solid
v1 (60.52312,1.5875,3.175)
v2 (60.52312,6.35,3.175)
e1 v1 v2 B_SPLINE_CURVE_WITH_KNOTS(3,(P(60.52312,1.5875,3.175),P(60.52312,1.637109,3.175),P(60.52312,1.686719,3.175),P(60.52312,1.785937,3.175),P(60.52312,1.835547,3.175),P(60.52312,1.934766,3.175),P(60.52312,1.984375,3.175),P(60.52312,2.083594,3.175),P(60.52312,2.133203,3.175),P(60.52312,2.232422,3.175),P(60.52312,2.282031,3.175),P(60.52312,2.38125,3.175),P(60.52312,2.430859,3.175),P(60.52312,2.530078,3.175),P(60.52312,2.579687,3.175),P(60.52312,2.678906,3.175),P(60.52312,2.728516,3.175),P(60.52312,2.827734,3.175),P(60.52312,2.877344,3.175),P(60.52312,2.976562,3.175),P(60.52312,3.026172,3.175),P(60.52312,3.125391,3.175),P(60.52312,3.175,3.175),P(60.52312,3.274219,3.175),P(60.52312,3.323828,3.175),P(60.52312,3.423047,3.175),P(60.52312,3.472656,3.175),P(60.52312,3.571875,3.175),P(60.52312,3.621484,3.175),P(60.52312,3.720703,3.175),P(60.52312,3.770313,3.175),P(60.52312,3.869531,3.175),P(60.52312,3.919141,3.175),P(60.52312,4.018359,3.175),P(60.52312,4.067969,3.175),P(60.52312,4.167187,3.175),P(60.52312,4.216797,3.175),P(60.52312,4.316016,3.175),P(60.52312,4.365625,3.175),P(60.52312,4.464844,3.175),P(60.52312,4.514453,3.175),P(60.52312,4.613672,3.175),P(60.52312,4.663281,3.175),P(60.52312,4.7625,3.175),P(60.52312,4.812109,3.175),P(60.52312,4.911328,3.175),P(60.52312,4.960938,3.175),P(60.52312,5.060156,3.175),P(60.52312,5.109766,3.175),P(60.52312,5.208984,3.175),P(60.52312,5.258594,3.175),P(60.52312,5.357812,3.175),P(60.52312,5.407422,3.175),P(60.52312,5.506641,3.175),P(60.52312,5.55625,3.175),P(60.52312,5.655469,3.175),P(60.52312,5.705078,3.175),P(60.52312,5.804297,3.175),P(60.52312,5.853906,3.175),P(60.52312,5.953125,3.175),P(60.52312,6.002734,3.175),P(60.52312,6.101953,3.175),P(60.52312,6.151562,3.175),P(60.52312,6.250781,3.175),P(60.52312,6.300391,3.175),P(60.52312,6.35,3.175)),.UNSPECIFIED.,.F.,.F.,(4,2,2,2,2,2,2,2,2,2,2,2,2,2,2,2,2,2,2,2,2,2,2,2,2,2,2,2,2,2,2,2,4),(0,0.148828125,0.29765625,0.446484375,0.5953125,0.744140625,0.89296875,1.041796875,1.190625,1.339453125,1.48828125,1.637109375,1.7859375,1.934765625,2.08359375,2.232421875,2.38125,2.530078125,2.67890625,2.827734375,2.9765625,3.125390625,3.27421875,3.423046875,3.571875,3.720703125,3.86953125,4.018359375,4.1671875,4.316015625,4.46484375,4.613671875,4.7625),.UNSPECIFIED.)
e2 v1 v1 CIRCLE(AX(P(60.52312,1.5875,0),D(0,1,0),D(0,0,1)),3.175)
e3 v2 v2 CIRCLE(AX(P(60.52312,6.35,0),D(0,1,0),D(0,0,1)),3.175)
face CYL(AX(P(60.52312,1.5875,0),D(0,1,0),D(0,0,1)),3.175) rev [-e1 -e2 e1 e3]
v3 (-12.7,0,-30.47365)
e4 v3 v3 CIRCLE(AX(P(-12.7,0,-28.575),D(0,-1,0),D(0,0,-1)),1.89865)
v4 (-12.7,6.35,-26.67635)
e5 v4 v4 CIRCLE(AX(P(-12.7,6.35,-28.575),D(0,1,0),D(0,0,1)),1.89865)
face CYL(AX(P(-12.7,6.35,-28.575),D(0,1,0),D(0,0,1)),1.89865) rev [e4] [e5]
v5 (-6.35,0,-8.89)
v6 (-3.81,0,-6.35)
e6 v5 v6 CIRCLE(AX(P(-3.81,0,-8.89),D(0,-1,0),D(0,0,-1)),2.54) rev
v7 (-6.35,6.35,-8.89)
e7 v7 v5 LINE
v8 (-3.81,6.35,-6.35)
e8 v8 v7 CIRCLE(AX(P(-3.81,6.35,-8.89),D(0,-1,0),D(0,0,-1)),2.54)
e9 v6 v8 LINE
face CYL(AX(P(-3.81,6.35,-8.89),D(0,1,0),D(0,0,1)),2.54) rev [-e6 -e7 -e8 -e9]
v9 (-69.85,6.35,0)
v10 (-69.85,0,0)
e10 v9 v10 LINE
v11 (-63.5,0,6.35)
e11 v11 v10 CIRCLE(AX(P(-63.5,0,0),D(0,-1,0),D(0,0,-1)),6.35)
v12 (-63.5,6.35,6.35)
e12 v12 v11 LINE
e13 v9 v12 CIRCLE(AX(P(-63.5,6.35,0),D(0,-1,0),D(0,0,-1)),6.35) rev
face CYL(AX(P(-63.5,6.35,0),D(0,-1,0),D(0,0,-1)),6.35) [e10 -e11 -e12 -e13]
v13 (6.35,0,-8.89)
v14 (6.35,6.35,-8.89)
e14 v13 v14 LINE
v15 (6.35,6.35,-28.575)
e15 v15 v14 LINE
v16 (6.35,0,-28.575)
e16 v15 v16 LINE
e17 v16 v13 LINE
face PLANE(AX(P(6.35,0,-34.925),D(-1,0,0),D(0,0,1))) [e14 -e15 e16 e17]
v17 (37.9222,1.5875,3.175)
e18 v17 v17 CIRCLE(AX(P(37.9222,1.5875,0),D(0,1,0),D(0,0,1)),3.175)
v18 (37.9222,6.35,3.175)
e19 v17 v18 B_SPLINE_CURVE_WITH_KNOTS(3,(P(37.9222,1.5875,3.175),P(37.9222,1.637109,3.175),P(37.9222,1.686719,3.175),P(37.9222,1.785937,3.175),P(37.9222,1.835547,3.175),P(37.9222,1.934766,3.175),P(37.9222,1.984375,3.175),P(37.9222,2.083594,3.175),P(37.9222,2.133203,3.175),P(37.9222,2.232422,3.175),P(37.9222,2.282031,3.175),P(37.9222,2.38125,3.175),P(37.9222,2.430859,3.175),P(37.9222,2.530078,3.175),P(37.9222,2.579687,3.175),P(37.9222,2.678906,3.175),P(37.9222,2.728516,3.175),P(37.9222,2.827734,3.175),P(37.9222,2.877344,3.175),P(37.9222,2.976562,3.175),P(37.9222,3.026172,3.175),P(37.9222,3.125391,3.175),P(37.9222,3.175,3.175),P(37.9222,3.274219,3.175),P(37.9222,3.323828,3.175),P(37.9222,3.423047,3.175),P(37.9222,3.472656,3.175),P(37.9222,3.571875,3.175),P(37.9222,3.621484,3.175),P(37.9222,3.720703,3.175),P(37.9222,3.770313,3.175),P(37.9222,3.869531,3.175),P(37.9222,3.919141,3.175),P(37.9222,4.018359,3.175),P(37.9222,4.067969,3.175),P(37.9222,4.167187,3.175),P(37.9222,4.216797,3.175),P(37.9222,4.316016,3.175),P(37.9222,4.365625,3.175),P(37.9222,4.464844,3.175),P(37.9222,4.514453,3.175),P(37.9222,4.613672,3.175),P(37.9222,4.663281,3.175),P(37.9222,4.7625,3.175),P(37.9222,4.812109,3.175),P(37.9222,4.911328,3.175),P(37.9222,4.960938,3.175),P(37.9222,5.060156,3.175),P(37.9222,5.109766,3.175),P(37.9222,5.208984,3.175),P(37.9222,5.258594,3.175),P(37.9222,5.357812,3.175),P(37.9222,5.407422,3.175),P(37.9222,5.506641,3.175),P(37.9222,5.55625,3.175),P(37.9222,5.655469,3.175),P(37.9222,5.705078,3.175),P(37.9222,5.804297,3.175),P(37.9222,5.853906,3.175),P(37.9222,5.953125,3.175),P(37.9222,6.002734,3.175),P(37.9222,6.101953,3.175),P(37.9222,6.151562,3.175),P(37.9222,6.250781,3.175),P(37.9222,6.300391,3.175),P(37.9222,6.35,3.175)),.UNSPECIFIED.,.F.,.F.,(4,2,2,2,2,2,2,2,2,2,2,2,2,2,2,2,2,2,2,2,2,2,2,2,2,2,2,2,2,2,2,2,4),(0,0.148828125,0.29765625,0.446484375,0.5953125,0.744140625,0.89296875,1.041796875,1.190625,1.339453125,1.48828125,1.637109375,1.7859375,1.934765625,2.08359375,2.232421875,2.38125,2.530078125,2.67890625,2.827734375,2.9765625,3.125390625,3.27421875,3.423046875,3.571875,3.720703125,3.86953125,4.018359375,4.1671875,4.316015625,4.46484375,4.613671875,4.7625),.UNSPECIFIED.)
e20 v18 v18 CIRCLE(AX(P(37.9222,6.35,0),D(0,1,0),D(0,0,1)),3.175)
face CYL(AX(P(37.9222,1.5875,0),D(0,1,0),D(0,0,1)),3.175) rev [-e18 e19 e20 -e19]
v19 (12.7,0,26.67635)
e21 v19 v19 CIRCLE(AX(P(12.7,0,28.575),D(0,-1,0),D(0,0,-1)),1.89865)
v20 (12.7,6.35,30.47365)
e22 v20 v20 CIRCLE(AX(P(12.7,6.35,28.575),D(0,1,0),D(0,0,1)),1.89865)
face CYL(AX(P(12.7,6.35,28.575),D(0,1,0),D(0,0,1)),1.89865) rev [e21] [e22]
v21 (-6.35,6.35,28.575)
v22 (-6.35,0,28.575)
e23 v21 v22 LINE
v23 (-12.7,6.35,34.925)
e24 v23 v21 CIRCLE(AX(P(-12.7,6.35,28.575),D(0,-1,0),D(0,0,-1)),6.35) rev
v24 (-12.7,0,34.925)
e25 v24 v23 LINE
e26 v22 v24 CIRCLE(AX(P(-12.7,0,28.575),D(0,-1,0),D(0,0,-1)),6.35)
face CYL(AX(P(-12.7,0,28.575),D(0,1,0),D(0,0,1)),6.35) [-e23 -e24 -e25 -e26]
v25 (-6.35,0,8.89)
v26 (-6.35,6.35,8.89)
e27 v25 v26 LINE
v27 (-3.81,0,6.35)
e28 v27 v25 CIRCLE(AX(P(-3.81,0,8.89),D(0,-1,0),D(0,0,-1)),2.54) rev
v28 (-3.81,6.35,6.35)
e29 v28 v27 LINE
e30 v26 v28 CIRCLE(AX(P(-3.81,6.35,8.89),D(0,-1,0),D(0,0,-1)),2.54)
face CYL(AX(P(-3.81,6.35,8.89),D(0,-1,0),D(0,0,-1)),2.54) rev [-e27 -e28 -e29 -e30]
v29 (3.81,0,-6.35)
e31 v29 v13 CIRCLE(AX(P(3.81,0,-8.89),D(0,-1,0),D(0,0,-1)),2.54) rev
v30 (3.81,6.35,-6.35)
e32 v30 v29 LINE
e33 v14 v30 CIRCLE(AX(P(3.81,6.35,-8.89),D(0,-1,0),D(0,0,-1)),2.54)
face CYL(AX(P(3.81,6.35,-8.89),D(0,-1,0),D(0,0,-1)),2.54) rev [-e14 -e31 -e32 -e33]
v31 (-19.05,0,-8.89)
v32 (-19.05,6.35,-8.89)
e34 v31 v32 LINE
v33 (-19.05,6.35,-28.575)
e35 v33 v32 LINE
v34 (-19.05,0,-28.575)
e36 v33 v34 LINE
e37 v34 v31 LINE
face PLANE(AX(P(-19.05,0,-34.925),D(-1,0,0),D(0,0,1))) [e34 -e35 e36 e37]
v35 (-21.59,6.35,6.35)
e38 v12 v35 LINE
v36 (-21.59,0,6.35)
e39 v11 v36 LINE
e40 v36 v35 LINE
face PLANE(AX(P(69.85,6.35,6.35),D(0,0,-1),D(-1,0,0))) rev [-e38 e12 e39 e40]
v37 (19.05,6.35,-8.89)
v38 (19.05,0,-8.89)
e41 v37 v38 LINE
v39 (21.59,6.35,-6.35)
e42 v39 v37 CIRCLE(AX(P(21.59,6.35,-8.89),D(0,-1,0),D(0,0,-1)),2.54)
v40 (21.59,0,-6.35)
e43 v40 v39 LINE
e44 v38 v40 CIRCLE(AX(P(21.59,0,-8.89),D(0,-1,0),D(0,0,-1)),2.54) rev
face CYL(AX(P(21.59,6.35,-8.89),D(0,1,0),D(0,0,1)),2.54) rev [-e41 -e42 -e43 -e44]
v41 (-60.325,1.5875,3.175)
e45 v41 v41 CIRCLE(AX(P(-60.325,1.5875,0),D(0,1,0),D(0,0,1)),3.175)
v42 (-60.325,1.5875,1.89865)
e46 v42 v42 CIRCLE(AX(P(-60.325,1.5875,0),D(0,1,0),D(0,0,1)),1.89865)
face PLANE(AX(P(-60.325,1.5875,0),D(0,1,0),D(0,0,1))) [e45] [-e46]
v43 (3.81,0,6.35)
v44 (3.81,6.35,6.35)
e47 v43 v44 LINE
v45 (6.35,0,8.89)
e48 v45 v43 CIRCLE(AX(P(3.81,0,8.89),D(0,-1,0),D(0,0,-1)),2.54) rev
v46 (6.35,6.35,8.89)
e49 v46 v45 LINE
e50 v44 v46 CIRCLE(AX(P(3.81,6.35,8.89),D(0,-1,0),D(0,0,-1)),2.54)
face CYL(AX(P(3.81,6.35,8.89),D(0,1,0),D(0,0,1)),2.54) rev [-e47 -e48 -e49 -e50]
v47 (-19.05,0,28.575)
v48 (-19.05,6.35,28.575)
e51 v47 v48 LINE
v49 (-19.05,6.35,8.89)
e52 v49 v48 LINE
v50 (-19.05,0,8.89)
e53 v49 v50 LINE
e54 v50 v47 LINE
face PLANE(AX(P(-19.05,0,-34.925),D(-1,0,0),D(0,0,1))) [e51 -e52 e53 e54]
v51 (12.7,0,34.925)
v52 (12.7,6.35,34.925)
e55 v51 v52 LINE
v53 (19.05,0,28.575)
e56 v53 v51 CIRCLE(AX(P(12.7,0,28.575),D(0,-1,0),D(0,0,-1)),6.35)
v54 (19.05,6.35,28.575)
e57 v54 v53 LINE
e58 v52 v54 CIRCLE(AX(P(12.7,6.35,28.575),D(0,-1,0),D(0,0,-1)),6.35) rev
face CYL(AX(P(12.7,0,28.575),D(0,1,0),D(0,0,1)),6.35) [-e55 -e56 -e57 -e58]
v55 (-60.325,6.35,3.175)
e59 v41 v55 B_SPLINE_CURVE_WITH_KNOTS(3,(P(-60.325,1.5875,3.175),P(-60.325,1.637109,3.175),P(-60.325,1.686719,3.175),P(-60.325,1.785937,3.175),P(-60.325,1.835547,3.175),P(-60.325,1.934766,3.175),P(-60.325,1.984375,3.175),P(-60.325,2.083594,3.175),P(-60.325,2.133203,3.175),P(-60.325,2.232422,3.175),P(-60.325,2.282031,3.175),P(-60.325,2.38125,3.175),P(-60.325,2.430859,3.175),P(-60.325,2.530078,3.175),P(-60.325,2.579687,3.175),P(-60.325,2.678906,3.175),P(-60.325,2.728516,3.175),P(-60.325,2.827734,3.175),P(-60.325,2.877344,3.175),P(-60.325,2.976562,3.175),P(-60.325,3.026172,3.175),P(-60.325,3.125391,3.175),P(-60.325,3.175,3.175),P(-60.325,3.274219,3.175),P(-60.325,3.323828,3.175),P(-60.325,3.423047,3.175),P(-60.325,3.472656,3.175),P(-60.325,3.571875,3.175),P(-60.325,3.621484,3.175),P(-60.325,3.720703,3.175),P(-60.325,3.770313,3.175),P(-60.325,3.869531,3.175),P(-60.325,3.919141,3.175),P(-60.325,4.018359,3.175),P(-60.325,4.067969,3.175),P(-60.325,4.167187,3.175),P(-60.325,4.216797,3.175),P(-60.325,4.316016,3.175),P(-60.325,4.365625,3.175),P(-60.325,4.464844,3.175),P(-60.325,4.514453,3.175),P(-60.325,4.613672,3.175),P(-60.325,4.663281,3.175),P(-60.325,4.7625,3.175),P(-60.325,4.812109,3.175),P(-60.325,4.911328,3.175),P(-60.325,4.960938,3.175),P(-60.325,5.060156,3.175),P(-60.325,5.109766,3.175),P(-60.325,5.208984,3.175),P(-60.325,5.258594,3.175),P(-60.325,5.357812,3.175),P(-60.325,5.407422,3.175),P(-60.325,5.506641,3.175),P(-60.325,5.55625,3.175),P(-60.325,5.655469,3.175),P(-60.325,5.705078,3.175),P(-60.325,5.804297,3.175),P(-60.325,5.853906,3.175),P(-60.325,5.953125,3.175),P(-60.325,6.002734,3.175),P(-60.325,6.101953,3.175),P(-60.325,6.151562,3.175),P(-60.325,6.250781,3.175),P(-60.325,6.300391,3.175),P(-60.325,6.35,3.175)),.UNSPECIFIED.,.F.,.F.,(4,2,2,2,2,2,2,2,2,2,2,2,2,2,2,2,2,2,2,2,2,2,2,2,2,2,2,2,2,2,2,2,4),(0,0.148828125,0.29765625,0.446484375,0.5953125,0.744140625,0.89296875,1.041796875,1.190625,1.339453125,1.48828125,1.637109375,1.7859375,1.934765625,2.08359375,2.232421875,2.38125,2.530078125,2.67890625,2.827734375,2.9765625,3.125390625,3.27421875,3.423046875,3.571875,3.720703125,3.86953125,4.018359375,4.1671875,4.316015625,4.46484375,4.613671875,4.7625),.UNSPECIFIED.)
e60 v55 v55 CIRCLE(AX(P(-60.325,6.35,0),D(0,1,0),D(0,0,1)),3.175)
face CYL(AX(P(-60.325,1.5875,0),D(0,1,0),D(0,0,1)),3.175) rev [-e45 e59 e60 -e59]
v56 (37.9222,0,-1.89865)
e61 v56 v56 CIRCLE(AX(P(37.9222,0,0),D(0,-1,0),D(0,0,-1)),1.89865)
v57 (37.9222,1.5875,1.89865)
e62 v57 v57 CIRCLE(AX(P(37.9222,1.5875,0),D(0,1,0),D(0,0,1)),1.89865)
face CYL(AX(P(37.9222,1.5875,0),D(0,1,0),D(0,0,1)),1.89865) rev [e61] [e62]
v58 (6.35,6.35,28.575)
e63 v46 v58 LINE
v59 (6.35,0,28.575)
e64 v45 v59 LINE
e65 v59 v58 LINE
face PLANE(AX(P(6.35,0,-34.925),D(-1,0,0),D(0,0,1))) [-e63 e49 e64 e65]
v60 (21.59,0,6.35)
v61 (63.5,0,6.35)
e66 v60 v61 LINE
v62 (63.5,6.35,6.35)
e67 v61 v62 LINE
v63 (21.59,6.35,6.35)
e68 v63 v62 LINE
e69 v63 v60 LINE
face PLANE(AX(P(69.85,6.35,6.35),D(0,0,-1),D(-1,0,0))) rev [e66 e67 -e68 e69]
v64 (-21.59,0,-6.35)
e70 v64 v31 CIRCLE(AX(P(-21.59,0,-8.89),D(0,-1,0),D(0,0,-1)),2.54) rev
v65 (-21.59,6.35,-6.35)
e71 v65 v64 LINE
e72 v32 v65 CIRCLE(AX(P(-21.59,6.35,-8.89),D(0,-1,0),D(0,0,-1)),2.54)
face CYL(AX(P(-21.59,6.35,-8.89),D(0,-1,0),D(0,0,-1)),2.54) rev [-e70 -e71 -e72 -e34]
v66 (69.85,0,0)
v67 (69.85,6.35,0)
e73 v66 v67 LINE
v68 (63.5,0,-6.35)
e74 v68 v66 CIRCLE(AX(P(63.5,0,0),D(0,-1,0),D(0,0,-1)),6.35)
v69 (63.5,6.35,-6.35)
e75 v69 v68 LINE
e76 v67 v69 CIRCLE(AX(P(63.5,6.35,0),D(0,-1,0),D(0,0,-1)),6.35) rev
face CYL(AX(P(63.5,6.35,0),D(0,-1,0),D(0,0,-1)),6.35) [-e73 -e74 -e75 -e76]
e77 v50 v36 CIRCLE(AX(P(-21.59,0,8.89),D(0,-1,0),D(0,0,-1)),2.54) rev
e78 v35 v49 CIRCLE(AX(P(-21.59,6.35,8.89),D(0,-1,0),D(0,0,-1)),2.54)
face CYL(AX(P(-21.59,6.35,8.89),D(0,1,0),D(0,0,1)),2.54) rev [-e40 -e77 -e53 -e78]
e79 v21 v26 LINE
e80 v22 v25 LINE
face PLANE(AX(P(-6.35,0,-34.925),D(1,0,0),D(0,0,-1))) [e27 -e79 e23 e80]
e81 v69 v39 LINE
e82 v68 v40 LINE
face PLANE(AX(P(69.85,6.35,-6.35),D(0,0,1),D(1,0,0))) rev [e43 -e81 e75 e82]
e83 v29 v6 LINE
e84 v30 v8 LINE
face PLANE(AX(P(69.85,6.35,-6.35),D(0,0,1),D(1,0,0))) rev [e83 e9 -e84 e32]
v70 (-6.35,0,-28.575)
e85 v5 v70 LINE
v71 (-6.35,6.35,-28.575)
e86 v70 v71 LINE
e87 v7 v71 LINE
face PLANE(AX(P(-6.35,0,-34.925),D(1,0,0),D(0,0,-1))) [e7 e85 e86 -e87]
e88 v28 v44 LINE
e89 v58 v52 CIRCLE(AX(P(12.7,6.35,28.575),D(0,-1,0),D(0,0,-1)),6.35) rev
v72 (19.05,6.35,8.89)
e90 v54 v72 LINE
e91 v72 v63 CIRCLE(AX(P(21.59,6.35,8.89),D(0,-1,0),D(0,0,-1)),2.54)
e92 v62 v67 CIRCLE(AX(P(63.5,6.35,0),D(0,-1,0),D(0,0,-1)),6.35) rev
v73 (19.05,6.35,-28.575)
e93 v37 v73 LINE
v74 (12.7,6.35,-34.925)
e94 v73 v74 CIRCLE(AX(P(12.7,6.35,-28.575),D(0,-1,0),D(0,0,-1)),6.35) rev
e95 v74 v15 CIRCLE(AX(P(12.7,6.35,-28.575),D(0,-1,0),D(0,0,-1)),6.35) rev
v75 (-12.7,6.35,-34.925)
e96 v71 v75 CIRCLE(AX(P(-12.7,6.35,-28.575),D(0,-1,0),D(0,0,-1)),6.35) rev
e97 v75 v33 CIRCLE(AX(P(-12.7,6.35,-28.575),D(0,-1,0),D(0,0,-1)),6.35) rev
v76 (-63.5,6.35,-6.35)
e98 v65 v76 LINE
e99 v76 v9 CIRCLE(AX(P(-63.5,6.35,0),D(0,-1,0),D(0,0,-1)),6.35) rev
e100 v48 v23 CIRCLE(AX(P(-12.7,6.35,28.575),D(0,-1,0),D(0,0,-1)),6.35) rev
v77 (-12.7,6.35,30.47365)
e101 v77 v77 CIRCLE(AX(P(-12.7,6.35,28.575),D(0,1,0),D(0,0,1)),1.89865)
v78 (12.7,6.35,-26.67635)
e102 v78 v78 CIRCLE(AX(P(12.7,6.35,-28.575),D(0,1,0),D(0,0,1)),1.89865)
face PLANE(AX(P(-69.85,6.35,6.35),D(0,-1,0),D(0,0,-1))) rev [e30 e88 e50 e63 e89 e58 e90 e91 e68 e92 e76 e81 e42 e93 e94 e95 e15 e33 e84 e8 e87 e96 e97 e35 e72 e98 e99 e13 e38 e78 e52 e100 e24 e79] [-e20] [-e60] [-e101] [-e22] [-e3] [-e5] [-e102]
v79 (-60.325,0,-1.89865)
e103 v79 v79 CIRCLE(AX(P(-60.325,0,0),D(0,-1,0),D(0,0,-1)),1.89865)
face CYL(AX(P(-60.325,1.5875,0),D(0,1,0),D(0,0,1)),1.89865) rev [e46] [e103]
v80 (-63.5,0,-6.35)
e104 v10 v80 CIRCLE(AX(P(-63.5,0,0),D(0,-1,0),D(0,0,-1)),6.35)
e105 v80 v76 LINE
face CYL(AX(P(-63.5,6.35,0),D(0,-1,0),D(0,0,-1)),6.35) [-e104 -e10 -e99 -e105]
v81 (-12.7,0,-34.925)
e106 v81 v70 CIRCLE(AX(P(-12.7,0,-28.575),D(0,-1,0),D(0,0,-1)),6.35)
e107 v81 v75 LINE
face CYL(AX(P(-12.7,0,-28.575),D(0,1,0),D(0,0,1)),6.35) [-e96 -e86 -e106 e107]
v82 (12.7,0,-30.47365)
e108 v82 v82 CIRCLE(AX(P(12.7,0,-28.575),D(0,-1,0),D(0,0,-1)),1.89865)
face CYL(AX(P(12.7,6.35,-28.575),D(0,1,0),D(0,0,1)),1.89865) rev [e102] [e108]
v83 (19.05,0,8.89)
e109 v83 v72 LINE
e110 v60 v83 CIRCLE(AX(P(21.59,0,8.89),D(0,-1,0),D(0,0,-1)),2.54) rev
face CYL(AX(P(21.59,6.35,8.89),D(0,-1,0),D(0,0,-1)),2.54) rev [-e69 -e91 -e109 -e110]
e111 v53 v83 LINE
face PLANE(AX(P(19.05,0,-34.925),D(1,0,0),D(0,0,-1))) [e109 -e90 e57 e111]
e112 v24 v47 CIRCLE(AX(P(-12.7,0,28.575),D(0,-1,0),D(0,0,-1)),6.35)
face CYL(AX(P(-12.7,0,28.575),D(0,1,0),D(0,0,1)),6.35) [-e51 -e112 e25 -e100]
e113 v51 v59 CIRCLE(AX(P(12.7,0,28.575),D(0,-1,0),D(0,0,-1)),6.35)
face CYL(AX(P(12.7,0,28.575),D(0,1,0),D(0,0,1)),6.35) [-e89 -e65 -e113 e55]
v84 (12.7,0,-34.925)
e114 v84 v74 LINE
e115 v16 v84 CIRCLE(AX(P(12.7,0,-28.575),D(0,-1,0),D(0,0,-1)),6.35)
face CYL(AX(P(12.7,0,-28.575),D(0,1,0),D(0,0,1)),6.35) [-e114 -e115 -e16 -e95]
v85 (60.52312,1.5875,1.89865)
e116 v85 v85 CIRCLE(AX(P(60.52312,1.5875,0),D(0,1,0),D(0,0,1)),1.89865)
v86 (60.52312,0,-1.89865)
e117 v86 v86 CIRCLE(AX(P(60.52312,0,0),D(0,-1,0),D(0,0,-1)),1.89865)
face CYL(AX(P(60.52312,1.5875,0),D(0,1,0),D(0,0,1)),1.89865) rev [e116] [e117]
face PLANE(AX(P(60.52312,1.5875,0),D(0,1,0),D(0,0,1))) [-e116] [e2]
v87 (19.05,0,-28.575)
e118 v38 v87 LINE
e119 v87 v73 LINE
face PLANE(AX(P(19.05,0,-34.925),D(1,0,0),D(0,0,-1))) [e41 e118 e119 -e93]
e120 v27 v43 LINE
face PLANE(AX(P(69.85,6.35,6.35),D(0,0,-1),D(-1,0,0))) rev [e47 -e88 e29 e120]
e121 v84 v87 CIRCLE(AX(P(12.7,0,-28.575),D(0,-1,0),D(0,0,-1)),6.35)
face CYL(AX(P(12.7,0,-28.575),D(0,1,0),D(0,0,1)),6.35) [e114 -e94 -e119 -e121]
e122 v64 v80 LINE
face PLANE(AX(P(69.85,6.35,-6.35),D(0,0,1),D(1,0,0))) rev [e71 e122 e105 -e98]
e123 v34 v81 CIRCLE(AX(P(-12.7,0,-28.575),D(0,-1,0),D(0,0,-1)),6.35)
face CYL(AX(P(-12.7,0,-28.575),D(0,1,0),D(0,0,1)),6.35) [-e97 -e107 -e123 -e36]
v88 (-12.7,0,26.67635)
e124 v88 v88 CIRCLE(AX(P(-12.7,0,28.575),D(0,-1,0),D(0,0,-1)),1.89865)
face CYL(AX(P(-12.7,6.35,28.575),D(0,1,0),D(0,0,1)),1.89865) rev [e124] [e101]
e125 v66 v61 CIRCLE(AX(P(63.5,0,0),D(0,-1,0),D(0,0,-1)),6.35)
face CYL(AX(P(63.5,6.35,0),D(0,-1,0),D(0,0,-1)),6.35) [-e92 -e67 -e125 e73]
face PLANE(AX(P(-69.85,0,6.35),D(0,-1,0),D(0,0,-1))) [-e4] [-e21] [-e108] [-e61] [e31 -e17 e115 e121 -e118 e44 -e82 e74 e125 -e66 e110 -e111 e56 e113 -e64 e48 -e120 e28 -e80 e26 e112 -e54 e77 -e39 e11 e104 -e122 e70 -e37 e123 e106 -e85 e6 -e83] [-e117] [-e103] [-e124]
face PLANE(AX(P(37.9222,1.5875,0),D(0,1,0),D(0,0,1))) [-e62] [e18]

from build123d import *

# Parameters (mm, degrees)
SKETCH1_W                 = 139.7
SKETCH1_H                 = 12.7
BOSS_EXTRUDE1_DEPTH       = 6.35
SKETCH2_R                 = 3.175
CUT_EXTRUDE2_DEPTH        = 4.7625
SKETCH3_R                 = 3.175
CUT_EXTRUDE3_DEPTH        = 4.7625
FILLET1_R                 = 6.35
F_6_CLEARANCE_HOLE1_D     = 3.7973
F_6_CLEARANCE_HOLE1_DEPTH = 25.4
F_6_CLEARANCE_HOLE1_TIP   = 1.140824014
F_6_CLEARANCE_HOLE2_D     = 3.7973
F_6_CLEARANCE_HOLE2_DEPTH = 25.4
F_6_CLEARANCE_HOLE2_TIP   = 1.140824014
SKETCH8_W                 = 12.7
SKETCH8_H                 = 69.85
BOSS_EXTRUDE2_DEPTH       = 6.35
F_6_CLEARANCE_HOLE3_D     = 3.7973
F_6_CLEARANCE_HOLE3_DEPTH = 25.4
F_6_CLEARANCE_HOLE3_TIP   = 1.140824014
FILLET2_R                 = 2.54
FILLET3_R                 = 6.35


with BuildPart() as part:
    # Sketch1 → Boss-Extrude1 (new body)
    with BuildSketch(Plane(origin=(0, 0, 0), x_dir=(1, 0, 0), z_dir=(0, 1, 0))):
        Rectangle(SKETCH1_W, SKETCH1_H)
    extrude(amount=BOSS_EXTRUDE1_DEPTH)

    # Sketch2 → Cut-Extrude2 (cut)
    with BuildSketch(Plane(origin=(0, 6.35, 0), x_dir=(1, 0, 0), z_dir=(0, 1, 0))):
        with Locations(Location((-60.325, 0, 0), (0, 0, 270))):
            Circle(SKETCH2_R)
        with Locations(Location((37.9222, 0, 0), (0, 0, 270))):
            Circle(SKETCH2_R)
        with Locations(Location((60.52312, 0, 0), (0, 0, 270))):
            Circle(SKETCH2_R)
    extrude(amount=-CUT_EXTRUDE2_DEPTH, mode=Mode.SUBTRACT)

    # Sketch3 → Cut-Extrude3 (cut)
    with BuildSketch(Plane.XZ):
        with Locations(Location((-12.7, 0, 0), (0, 0, 270))):
            Circle(SKETCH3_R)
        with Locations(Location((12.7, 0, 0), (0, 0, 270))):
            Circle(SKETCH3_R)
    extrude(amount=-CUT_EXTRUDE3_DEPTH, mode=Mode.SUBTRACT)

    # Fillet1
    fillet1_edges = [part.edges().sort_by_distance(p)[0] for p in [
        (69.85, 3.175, 6.35),
        (69.85, 3.175, -6.35),
        (-69.85, 3.175, 6.35),
        (-69.85, 3.175, -6.35),
    ]]
    fillet(fillet1_edges, radius=FILLET1_R - 0.0001)  # a hair under: the kernel refuses the full size

    # #6 Clearance Hole1
    with Locations(Plane(origin=(0, 1.5875, 0), x_dir=(-1, 0, 0), z_dir=(0, 1, 0))):
        with Locations((-60.52312, 0), (-37.9222, 0), (60.325, 0)):
            Hole(F_6_CLEARANCE_HOLE1_D / 2, depth=F_6_CLEARANCE_HOLE1_DEPTH)
            with Locations((0, 0, -(F_6_CLEARANCE_HOLE1_DEPTH + F_6_CLEARANCE_HOLE1_TIP / 2))):  # 118° drill point
                Cone(0, F_6_CLEARANCE_HOLE1_D / 2, F_6_CLEARANCE_HOLE1_TIP, mode=Mode.SUBTRACT)

    # #6 Clearance Hole2
    with Locations(Plane.XZ.offset(-4.7625)):
        with Locations((-12.7, 0), (12.7, 0)):
            Hole(F_6_CLEARANCE_HOLE2_D / 2, depth=F_6_CLEARANCE_HOLE2_DEPTH)
            with Locations((0, 0, -(F_6_CLEARANCE_HOLE2_DEPTH + F_6_CLEARANCE_HOLE2_TIP / 2))):  # 118° drill point
                Cone(0, F_6_CLEARANCE_HOLE2_D / 2, F_6_CLEARANCE_HOLE2_TIP, mode=Mode.SUBTRACT)

    # Sketch8 → Boss-Extrude2 (add)
    with BuildSketch(Plane(origin=(0, 6.35, 0), x_dir=(1, 0, 0), z_dir=(0, 1, 0))):
        with Locations((-12.7, 0)):
            Rectangle(SKETCH8_W, SKETCH8_H)
        with Locations((12.7, 0)):
            Rectangle(SKETCH8_W, SKETCH8_H)
    extrude(amount=-BOSS_EXTRUDE2_DEPTH)

    # #6 Clearance Hole3
    with Locations(Plane(origin=(0, 6.35, 0), x_dir=(-1, 0, 0), z_dir=(0, 1, 0))):
        with Locations((12.7, -28.575), (12.7, 28.575), (-12.7, 28.575), (-12.7, -28.575)):
            Hole(F_6_CLEARANCE_HOLE3_D / 2, depth=F_6_CLEARANCE_HOLE3_DEPTH)
            with Locations((0, 0, -(F_6_CLEARANCE_HOLE3_DEPTH + F_6_CLEARANCE_HOLE3_TIP / 2))):  # 118° drill point
                Cone(0, F_6_CLEARANCE_HOLE3_D / 2, F_6_CLEARANCE_HOLE3_TIP, mode=Mode.SUBTRACT)

    # Fillet2
    fillet2_edges = [part.edges().sort_by_distance(p)[0] for p in [
        (6.35, 3.175, 6.35),
        (6.35, 3.175, -6.35),
        (19.05, 3.175, 6.35),
        (19.05, 3.175, -6.35),
        (-19.05, 3.175, 6.35),
        (-19.05, 3.175, -6.35),
        (-6.35, 3.175, 6.35),
        (-6.35, 3.175, -6.35),
    ]]
    fillet(fillet2_edges, radius=FILLET2_R)

    # Fillet3
    fillet3_edges = [part.edges().sort_by_distance(p)[0] for p in [
        (19.05, 3.175, -34.925),
        (6.35, 3.175, -34.925),
        (-6.35, 3.175, -34.925),
        (-19.05, 3.175, -34.925),
        (-19.05, 3.175, 34.925),
        (-6.35, 3.175, 34.925),
        (6.35, 3.175, 34.925),
        (19.05, 3.175, 34.925),
    ]]
    fillet(fillet3_edges, radius=FILLET3_R - 0.0001)  # a hair under: the kernel refuses the full size


solid = part.part
